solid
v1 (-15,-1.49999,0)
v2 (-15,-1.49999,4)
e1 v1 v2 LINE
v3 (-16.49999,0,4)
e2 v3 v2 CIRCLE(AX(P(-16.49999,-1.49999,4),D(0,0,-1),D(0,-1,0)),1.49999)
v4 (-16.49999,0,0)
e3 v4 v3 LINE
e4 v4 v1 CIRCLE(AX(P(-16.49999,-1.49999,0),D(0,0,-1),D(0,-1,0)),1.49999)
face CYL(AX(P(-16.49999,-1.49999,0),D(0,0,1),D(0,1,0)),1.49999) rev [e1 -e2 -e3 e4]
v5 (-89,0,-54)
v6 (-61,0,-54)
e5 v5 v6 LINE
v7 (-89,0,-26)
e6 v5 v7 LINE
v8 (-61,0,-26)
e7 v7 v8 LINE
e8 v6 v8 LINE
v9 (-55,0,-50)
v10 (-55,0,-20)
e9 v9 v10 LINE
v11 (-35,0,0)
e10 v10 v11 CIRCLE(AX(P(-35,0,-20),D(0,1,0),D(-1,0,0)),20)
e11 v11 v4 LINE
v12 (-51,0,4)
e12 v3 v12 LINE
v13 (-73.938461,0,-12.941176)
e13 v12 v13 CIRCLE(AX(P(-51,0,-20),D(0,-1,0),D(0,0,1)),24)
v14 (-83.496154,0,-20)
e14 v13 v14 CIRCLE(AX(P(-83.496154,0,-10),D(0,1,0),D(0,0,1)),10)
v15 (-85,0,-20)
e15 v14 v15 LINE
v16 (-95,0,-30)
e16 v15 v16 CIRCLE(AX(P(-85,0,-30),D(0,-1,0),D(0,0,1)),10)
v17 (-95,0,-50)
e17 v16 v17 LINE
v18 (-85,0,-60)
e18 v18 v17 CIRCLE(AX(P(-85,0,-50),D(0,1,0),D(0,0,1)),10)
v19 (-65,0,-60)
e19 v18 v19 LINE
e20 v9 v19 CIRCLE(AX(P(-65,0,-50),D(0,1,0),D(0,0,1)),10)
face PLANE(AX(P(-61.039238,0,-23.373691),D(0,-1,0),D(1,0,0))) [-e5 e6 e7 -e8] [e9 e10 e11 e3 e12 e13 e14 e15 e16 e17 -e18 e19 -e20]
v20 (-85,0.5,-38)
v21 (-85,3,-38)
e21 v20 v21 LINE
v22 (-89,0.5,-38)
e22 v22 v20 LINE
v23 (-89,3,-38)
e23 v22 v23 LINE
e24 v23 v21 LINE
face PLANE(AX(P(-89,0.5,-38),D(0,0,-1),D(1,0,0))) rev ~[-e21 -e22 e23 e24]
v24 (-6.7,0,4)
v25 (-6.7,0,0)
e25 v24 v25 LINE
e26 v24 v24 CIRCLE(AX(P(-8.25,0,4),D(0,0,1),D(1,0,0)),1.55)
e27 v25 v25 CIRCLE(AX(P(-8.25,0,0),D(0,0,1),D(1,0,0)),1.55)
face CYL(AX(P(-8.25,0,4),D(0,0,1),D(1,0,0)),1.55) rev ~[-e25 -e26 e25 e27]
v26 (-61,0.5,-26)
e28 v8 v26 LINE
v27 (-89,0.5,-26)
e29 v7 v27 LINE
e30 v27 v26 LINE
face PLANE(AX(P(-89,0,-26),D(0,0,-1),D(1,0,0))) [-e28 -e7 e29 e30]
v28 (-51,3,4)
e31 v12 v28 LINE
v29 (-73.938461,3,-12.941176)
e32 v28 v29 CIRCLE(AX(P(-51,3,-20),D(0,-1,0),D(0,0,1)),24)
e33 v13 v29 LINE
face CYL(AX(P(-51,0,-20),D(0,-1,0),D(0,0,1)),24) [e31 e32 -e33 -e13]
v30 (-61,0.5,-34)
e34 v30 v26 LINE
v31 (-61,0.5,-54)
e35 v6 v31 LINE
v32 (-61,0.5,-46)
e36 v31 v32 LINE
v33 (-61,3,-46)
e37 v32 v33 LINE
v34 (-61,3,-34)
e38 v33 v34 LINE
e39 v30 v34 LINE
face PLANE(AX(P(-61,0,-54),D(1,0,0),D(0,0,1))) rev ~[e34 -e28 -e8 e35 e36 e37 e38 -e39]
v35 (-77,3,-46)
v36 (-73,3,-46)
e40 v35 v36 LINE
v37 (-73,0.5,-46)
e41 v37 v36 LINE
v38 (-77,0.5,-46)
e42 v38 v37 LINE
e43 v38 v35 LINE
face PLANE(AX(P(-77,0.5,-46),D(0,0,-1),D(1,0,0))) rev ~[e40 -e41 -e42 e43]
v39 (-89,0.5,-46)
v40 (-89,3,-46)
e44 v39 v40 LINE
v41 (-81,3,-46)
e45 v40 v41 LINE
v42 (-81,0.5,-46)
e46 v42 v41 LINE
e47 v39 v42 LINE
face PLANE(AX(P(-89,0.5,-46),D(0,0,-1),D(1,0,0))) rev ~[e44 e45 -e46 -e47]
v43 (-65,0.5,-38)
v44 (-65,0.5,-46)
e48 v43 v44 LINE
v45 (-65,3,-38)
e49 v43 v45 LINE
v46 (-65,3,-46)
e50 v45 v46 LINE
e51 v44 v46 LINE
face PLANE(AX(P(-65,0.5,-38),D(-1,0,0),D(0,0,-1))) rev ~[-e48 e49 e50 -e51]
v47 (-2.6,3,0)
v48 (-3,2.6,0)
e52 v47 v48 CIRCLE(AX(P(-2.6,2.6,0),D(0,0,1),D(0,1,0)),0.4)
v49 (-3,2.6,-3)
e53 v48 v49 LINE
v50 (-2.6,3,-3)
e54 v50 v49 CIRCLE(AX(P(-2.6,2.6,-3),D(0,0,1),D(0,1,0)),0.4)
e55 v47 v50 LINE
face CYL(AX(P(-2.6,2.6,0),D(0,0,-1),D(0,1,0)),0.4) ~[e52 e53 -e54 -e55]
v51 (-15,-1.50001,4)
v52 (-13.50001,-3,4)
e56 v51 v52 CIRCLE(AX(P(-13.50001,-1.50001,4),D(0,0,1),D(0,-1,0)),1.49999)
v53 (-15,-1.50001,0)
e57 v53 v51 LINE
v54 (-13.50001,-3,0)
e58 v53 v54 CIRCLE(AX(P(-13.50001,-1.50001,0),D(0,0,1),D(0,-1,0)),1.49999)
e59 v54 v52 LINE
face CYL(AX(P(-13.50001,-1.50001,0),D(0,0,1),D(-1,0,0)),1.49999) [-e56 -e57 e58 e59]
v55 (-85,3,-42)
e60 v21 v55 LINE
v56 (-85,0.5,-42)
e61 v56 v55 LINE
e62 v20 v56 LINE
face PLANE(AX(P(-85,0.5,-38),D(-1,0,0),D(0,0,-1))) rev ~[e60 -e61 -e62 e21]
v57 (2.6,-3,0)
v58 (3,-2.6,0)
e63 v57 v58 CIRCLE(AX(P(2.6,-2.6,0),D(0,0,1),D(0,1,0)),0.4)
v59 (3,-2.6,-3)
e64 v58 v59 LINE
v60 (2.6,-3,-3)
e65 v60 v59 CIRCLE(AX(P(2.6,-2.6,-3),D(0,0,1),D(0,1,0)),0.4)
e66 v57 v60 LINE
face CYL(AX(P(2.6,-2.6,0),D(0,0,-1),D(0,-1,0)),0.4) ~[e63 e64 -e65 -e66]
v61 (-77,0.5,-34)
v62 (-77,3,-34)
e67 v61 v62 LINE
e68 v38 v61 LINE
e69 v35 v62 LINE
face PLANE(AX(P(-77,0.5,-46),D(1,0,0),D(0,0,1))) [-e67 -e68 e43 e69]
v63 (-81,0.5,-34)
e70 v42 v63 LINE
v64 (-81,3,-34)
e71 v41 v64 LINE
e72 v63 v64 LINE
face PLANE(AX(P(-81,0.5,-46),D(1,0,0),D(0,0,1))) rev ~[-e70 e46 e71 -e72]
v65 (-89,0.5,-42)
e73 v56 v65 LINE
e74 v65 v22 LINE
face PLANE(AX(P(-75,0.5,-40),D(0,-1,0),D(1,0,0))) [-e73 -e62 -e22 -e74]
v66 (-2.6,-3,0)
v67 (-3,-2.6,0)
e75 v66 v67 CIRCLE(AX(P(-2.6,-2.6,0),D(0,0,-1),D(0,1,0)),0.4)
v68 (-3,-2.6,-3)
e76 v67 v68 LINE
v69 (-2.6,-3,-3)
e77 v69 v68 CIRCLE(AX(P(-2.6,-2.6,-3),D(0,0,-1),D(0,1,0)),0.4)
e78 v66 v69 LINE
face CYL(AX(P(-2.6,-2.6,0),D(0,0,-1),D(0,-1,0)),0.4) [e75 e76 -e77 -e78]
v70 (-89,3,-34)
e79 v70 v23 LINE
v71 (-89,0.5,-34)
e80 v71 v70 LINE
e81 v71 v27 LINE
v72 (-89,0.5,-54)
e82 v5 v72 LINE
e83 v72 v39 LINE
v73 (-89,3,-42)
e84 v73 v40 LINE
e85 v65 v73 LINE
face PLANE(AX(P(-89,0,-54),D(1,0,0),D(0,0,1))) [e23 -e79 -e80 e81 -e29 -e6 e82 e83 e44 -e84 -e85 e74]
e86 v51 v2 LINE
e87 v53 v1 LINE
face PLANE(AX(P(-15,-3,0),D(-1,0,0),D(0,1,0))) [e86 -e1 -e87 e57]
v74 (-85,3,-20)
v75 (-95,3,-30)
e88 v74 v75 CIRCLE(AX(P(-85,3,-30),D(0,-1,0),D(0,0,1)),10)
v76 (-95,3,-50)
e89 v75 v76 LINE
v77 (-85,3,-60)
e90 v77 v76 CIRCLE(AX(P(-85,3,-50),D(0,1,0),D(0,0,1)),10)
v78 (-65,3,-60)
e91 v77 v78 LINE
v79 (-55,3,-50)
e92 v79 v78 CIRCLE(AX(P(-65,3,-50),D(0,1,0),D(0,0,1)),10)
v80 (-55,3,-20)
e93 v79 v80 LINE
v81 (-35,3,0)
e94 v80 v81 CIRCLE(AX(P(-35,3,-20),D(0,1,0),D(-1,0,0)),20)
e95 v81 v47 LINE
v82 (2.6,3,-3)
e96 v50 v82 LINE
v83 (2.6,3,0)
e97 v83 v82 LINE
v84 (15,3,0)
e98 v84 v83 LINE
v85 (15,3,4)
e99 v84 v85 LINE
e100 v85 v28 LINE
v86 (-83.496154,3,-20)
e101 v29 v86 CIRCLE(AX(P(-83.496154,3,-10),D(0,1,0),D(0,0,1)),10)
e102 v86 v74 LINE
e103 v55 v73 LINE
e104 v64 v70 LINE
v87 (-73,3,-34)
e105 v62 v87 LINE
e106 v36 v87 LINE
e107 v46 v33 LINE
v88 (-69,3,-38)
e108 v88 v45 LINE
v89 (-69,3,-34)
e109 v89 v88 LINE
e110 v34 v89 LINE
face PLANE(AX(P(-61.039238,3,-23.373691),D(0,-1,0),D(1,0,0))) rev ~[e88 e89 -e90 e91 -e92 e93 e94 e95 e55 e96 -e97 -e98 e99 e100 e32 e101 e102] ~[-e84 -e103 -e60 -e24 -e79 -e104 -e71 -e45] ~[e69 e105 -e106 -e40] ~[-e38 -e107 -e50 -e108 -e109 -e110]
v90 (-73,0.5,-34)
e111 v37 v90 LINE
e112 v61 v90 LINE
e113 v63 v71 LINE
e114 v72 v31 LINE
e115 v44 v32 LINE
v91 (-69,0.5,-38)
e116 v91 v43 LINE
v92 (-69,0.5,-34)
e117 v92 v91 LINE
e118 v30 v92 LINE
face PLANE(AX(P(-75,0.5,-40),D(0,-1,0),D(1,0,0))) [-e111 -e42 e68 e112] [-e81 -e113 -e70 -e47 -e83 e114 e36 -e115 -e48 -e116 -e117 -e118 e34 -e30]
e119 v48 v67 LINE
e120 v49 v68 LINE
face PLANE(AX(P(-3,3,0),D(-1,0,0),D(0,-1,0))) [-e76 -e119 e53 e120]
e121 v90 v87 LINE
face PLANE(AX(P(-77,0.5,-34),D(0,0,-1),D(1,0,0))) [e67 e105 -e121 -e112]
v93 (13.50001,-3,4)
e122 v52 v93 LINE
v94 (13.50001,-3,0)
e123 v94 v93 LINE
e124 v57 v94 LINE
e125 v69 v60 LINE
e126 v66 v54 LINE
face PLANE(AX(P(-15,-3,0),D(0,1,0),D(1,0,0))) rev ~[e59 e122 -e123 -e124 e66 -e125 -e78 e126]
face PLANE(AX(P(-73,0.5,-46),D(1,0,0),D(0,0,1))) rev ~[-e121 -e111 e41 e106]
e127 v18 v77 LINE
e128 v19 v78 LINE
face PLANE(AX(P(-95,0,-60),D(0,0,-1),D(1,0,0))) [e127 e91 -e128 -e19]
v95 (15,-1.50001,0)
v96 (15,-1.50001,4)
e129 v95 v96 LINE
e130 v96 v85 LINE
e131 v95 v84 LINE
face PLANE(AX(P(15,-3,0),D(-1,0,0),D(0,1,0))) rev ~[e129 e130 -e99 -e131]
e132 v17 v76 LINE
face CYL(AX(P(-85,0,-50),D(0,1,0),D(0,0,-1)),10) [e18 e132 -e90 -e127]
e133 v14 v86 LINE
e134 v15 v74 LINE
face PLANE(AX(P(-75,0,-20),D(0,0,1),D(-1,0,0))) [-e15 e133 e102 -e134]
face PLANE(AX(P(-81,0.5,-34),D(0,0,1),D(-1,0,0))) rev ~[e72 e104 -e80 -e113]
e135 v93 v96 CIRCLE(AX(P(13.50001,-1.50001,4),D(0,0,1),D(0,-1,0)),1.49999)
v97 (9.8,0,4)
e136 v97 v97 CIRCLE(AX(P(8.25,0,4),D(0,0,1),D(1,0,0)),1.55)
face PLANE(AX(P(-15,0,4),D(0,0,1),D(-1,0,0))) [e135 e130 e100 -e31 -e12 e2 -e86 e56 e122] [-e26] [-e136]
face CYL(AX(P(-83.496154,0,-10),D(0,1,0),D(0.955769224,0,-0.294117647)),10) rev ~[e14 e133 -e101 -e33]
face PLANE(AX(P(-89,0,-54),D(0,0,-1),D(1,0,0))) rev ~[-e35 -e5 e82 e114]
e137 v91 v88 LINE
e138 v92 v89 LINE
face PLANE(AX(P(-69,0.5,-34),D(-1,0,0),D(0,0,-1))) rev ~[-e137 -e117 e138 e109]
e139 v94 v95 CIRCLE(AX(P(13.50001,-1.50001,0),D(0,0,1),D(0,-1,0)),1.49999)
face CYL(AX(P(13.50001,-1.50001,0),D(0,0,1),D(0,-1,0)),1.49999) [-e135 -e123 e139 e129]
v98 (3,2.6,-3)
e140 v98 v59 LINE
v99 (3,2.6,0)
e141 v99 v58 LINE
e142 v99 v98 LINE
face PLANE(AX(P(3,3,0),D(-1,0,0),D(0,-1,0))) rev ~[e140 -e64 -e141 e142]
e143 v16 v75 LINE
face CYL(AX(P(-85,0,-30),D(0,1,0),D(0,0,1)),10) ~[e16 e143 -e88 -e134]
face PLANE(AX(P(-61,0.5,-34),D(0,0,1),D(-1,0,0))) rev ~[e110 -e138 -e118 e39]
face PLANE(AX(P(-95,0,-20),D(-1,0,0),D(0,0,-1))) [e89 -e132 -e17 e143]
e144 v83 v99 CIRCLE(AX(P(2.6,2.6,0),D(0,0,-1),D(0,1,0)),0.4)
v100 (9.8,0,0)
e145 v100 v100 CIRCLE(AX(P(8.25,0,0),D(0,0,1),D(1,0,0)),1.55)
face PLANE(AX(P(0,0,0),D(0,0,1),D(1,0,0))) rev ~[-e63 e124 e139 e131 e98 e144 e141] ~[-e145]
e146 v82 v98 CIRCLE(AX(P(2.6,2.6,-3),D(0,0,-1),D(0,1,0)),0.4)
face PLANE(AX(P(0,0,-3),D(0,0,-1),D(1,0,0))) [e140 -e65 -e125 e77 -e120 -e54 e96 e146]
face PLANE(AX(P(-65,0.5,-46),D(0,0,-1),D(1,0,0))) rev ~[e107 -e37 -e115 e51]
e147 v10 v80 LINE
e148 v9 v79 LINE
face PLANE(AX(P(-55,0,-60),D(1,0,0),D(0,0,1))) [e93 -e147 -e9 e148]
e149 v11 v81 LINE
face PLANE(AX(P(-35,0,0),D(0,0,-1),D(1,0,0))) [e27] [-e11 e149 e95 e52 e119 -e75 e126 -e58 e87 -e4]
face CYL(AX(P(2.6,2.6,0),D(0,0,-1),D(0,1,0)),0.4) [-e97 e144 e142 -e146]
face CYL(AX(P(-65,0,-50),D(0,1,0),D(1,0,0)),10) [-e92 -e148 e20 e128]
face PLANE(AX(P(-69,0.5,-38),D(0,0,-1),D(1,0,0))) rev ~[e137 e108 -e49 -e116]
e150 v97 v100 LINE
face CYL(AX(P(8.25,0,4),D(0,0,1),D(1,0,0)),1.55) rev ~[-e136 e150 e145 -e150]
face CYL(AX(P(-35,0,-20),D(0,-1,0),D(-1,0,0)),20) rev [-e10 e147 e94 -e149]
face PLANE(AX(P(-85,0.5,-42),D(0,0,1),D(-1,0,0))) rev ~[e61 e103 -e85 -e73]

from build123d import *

# Parameters (mm, degrees)
F0_W      = 30
F0_H      = 6
F1_DEPTH  = 4
F2_W      = 6
F2_H      = 6
F3_DEPTH  = 3
F4_R      = 1.55
F5_DEPTH  = 4
F7_DEPTH  = 3
F8_W      = 28
F8_H      = 28
F9_DEPTH  = 0.5
F11_R     = 1.49999
F12_R     = 10
F13_R     = 0.4
F10_W     = 4
F10_H     = 12
F14_DEPTH = 2.5


# Not quite as in the source:
# - a fillet or chamfer is up to 0.001 mm smaller than in the source, because OpenCascade refuses the exact size


with BuildPart() as f1:
    # F0 (on Top) → F1 (new body)
    with BuildSketch(Plane.XY):
        Rectangle(F0_W, F0_H)
    extrude(amount=F1_DEPTH)

    # F2 (on face) → F3 (join)
    with BuildSketch(Plane(origin=(0, 0, 0), x_dir=(1, 0, 0), z_dir=(0, 0, -1))):
        Rectangle(F2_W, F2_H)
    extrude(amount=F3_DEPTH)

    # F4 (on face) → F5 (cut, through all)
    with BuildSketch(Plane.XY.offset(4)):
        with Locations((-8.25, 0)):
            Circle(F4_R)
        with Locations((8.25, 0)):
            Circle(F4_R)
    extrude(amount=-F5_DEPTH, mode=Mode.SUBTRACT)

    # F6 (on Front) → F7 (join, through all)
    with BuildSketch(Plane.XZ):
        with BuildLine():
            Line((-15, 0), (-15, 4))
            Line((-15, 4), (-51, 4))
            ThreePointArc((-51, 4), (-67.9705627485, -3.0294372515), (-75, -20))
            Line((-75, -20), (-95, -20))
            Line((-95, -20), (-95, -60))
            Line((-95, -60), (-55, -60))
            Line((-55, -60), (-55, -20))
            ThreePointArc((-55, -20), (-49.1421356237, -5.8578643763), (-35, 0))
            Line((-35, 0), (-15, 0))
        make_face()
    extrude(amount=-F7_DEPTH)

    # F8 (on face) → F9 (cut)
    with BuildSketch(Plane.XZ):
        with Locations((-75, -40)):
            Rectangle(F8_W, F8_H)
    extrude(amount=-F9_DEPTH, mode=Mode.SUBTRACT)

    # F11 (radius 1.5 in the source; OpenCascade refuses exactly that, so slightly less here)
    f11_edges = [f1.edges().sort_by_distance(p)[0] for p in [
        (-15, 0, 2),
        (-15, -3, 2),
        (15, -3, 2),
    ]]
    fillet(f11_edges, radius=F11_R)

    # F12
    f12_edges = [f1.edges().sort_by_distance(p)[0] for p in [
        (-55, 1.5, -60),
        (-95, 1.5, -60),
        (-95, 1.5, -20),
        (-75, 1.5, -20),
    ]]
    fillet(f12_edges, radius=F12_R)

    # F13
    f13_edges = [f1.edges().sort_by_distance(p)[0] for p in [
        (3, -3, -1.5),
        (3, 3, -1.5),
        (-3, 3, -1.5),
        (-3, -3, -1.5),
    ]]
    fillet(f13_edges, radius=F13_R)

    # F10 (on face) → F14 (cut, through all)
    with BuildSketch(Plane.XZ.offset(-0.5)):
        Polygon((-81, -34), (-89, -34), (-89, -38), (-85, -38), (-85, -42), (-89, -42), (-89, -46), (-81, -46), align=None)
        with Locations((-75, -40)):
            Rectangle(F10_W, F10_H)
        Polygon((-61, -46), (-61, -34), (-69, -34), (-69, -38), (-65, -38), (-65, -46), align=None)
    extrude(amount=-F14_DEPTH, mode=Mode.SUBTRACT)


solid = f1.part
